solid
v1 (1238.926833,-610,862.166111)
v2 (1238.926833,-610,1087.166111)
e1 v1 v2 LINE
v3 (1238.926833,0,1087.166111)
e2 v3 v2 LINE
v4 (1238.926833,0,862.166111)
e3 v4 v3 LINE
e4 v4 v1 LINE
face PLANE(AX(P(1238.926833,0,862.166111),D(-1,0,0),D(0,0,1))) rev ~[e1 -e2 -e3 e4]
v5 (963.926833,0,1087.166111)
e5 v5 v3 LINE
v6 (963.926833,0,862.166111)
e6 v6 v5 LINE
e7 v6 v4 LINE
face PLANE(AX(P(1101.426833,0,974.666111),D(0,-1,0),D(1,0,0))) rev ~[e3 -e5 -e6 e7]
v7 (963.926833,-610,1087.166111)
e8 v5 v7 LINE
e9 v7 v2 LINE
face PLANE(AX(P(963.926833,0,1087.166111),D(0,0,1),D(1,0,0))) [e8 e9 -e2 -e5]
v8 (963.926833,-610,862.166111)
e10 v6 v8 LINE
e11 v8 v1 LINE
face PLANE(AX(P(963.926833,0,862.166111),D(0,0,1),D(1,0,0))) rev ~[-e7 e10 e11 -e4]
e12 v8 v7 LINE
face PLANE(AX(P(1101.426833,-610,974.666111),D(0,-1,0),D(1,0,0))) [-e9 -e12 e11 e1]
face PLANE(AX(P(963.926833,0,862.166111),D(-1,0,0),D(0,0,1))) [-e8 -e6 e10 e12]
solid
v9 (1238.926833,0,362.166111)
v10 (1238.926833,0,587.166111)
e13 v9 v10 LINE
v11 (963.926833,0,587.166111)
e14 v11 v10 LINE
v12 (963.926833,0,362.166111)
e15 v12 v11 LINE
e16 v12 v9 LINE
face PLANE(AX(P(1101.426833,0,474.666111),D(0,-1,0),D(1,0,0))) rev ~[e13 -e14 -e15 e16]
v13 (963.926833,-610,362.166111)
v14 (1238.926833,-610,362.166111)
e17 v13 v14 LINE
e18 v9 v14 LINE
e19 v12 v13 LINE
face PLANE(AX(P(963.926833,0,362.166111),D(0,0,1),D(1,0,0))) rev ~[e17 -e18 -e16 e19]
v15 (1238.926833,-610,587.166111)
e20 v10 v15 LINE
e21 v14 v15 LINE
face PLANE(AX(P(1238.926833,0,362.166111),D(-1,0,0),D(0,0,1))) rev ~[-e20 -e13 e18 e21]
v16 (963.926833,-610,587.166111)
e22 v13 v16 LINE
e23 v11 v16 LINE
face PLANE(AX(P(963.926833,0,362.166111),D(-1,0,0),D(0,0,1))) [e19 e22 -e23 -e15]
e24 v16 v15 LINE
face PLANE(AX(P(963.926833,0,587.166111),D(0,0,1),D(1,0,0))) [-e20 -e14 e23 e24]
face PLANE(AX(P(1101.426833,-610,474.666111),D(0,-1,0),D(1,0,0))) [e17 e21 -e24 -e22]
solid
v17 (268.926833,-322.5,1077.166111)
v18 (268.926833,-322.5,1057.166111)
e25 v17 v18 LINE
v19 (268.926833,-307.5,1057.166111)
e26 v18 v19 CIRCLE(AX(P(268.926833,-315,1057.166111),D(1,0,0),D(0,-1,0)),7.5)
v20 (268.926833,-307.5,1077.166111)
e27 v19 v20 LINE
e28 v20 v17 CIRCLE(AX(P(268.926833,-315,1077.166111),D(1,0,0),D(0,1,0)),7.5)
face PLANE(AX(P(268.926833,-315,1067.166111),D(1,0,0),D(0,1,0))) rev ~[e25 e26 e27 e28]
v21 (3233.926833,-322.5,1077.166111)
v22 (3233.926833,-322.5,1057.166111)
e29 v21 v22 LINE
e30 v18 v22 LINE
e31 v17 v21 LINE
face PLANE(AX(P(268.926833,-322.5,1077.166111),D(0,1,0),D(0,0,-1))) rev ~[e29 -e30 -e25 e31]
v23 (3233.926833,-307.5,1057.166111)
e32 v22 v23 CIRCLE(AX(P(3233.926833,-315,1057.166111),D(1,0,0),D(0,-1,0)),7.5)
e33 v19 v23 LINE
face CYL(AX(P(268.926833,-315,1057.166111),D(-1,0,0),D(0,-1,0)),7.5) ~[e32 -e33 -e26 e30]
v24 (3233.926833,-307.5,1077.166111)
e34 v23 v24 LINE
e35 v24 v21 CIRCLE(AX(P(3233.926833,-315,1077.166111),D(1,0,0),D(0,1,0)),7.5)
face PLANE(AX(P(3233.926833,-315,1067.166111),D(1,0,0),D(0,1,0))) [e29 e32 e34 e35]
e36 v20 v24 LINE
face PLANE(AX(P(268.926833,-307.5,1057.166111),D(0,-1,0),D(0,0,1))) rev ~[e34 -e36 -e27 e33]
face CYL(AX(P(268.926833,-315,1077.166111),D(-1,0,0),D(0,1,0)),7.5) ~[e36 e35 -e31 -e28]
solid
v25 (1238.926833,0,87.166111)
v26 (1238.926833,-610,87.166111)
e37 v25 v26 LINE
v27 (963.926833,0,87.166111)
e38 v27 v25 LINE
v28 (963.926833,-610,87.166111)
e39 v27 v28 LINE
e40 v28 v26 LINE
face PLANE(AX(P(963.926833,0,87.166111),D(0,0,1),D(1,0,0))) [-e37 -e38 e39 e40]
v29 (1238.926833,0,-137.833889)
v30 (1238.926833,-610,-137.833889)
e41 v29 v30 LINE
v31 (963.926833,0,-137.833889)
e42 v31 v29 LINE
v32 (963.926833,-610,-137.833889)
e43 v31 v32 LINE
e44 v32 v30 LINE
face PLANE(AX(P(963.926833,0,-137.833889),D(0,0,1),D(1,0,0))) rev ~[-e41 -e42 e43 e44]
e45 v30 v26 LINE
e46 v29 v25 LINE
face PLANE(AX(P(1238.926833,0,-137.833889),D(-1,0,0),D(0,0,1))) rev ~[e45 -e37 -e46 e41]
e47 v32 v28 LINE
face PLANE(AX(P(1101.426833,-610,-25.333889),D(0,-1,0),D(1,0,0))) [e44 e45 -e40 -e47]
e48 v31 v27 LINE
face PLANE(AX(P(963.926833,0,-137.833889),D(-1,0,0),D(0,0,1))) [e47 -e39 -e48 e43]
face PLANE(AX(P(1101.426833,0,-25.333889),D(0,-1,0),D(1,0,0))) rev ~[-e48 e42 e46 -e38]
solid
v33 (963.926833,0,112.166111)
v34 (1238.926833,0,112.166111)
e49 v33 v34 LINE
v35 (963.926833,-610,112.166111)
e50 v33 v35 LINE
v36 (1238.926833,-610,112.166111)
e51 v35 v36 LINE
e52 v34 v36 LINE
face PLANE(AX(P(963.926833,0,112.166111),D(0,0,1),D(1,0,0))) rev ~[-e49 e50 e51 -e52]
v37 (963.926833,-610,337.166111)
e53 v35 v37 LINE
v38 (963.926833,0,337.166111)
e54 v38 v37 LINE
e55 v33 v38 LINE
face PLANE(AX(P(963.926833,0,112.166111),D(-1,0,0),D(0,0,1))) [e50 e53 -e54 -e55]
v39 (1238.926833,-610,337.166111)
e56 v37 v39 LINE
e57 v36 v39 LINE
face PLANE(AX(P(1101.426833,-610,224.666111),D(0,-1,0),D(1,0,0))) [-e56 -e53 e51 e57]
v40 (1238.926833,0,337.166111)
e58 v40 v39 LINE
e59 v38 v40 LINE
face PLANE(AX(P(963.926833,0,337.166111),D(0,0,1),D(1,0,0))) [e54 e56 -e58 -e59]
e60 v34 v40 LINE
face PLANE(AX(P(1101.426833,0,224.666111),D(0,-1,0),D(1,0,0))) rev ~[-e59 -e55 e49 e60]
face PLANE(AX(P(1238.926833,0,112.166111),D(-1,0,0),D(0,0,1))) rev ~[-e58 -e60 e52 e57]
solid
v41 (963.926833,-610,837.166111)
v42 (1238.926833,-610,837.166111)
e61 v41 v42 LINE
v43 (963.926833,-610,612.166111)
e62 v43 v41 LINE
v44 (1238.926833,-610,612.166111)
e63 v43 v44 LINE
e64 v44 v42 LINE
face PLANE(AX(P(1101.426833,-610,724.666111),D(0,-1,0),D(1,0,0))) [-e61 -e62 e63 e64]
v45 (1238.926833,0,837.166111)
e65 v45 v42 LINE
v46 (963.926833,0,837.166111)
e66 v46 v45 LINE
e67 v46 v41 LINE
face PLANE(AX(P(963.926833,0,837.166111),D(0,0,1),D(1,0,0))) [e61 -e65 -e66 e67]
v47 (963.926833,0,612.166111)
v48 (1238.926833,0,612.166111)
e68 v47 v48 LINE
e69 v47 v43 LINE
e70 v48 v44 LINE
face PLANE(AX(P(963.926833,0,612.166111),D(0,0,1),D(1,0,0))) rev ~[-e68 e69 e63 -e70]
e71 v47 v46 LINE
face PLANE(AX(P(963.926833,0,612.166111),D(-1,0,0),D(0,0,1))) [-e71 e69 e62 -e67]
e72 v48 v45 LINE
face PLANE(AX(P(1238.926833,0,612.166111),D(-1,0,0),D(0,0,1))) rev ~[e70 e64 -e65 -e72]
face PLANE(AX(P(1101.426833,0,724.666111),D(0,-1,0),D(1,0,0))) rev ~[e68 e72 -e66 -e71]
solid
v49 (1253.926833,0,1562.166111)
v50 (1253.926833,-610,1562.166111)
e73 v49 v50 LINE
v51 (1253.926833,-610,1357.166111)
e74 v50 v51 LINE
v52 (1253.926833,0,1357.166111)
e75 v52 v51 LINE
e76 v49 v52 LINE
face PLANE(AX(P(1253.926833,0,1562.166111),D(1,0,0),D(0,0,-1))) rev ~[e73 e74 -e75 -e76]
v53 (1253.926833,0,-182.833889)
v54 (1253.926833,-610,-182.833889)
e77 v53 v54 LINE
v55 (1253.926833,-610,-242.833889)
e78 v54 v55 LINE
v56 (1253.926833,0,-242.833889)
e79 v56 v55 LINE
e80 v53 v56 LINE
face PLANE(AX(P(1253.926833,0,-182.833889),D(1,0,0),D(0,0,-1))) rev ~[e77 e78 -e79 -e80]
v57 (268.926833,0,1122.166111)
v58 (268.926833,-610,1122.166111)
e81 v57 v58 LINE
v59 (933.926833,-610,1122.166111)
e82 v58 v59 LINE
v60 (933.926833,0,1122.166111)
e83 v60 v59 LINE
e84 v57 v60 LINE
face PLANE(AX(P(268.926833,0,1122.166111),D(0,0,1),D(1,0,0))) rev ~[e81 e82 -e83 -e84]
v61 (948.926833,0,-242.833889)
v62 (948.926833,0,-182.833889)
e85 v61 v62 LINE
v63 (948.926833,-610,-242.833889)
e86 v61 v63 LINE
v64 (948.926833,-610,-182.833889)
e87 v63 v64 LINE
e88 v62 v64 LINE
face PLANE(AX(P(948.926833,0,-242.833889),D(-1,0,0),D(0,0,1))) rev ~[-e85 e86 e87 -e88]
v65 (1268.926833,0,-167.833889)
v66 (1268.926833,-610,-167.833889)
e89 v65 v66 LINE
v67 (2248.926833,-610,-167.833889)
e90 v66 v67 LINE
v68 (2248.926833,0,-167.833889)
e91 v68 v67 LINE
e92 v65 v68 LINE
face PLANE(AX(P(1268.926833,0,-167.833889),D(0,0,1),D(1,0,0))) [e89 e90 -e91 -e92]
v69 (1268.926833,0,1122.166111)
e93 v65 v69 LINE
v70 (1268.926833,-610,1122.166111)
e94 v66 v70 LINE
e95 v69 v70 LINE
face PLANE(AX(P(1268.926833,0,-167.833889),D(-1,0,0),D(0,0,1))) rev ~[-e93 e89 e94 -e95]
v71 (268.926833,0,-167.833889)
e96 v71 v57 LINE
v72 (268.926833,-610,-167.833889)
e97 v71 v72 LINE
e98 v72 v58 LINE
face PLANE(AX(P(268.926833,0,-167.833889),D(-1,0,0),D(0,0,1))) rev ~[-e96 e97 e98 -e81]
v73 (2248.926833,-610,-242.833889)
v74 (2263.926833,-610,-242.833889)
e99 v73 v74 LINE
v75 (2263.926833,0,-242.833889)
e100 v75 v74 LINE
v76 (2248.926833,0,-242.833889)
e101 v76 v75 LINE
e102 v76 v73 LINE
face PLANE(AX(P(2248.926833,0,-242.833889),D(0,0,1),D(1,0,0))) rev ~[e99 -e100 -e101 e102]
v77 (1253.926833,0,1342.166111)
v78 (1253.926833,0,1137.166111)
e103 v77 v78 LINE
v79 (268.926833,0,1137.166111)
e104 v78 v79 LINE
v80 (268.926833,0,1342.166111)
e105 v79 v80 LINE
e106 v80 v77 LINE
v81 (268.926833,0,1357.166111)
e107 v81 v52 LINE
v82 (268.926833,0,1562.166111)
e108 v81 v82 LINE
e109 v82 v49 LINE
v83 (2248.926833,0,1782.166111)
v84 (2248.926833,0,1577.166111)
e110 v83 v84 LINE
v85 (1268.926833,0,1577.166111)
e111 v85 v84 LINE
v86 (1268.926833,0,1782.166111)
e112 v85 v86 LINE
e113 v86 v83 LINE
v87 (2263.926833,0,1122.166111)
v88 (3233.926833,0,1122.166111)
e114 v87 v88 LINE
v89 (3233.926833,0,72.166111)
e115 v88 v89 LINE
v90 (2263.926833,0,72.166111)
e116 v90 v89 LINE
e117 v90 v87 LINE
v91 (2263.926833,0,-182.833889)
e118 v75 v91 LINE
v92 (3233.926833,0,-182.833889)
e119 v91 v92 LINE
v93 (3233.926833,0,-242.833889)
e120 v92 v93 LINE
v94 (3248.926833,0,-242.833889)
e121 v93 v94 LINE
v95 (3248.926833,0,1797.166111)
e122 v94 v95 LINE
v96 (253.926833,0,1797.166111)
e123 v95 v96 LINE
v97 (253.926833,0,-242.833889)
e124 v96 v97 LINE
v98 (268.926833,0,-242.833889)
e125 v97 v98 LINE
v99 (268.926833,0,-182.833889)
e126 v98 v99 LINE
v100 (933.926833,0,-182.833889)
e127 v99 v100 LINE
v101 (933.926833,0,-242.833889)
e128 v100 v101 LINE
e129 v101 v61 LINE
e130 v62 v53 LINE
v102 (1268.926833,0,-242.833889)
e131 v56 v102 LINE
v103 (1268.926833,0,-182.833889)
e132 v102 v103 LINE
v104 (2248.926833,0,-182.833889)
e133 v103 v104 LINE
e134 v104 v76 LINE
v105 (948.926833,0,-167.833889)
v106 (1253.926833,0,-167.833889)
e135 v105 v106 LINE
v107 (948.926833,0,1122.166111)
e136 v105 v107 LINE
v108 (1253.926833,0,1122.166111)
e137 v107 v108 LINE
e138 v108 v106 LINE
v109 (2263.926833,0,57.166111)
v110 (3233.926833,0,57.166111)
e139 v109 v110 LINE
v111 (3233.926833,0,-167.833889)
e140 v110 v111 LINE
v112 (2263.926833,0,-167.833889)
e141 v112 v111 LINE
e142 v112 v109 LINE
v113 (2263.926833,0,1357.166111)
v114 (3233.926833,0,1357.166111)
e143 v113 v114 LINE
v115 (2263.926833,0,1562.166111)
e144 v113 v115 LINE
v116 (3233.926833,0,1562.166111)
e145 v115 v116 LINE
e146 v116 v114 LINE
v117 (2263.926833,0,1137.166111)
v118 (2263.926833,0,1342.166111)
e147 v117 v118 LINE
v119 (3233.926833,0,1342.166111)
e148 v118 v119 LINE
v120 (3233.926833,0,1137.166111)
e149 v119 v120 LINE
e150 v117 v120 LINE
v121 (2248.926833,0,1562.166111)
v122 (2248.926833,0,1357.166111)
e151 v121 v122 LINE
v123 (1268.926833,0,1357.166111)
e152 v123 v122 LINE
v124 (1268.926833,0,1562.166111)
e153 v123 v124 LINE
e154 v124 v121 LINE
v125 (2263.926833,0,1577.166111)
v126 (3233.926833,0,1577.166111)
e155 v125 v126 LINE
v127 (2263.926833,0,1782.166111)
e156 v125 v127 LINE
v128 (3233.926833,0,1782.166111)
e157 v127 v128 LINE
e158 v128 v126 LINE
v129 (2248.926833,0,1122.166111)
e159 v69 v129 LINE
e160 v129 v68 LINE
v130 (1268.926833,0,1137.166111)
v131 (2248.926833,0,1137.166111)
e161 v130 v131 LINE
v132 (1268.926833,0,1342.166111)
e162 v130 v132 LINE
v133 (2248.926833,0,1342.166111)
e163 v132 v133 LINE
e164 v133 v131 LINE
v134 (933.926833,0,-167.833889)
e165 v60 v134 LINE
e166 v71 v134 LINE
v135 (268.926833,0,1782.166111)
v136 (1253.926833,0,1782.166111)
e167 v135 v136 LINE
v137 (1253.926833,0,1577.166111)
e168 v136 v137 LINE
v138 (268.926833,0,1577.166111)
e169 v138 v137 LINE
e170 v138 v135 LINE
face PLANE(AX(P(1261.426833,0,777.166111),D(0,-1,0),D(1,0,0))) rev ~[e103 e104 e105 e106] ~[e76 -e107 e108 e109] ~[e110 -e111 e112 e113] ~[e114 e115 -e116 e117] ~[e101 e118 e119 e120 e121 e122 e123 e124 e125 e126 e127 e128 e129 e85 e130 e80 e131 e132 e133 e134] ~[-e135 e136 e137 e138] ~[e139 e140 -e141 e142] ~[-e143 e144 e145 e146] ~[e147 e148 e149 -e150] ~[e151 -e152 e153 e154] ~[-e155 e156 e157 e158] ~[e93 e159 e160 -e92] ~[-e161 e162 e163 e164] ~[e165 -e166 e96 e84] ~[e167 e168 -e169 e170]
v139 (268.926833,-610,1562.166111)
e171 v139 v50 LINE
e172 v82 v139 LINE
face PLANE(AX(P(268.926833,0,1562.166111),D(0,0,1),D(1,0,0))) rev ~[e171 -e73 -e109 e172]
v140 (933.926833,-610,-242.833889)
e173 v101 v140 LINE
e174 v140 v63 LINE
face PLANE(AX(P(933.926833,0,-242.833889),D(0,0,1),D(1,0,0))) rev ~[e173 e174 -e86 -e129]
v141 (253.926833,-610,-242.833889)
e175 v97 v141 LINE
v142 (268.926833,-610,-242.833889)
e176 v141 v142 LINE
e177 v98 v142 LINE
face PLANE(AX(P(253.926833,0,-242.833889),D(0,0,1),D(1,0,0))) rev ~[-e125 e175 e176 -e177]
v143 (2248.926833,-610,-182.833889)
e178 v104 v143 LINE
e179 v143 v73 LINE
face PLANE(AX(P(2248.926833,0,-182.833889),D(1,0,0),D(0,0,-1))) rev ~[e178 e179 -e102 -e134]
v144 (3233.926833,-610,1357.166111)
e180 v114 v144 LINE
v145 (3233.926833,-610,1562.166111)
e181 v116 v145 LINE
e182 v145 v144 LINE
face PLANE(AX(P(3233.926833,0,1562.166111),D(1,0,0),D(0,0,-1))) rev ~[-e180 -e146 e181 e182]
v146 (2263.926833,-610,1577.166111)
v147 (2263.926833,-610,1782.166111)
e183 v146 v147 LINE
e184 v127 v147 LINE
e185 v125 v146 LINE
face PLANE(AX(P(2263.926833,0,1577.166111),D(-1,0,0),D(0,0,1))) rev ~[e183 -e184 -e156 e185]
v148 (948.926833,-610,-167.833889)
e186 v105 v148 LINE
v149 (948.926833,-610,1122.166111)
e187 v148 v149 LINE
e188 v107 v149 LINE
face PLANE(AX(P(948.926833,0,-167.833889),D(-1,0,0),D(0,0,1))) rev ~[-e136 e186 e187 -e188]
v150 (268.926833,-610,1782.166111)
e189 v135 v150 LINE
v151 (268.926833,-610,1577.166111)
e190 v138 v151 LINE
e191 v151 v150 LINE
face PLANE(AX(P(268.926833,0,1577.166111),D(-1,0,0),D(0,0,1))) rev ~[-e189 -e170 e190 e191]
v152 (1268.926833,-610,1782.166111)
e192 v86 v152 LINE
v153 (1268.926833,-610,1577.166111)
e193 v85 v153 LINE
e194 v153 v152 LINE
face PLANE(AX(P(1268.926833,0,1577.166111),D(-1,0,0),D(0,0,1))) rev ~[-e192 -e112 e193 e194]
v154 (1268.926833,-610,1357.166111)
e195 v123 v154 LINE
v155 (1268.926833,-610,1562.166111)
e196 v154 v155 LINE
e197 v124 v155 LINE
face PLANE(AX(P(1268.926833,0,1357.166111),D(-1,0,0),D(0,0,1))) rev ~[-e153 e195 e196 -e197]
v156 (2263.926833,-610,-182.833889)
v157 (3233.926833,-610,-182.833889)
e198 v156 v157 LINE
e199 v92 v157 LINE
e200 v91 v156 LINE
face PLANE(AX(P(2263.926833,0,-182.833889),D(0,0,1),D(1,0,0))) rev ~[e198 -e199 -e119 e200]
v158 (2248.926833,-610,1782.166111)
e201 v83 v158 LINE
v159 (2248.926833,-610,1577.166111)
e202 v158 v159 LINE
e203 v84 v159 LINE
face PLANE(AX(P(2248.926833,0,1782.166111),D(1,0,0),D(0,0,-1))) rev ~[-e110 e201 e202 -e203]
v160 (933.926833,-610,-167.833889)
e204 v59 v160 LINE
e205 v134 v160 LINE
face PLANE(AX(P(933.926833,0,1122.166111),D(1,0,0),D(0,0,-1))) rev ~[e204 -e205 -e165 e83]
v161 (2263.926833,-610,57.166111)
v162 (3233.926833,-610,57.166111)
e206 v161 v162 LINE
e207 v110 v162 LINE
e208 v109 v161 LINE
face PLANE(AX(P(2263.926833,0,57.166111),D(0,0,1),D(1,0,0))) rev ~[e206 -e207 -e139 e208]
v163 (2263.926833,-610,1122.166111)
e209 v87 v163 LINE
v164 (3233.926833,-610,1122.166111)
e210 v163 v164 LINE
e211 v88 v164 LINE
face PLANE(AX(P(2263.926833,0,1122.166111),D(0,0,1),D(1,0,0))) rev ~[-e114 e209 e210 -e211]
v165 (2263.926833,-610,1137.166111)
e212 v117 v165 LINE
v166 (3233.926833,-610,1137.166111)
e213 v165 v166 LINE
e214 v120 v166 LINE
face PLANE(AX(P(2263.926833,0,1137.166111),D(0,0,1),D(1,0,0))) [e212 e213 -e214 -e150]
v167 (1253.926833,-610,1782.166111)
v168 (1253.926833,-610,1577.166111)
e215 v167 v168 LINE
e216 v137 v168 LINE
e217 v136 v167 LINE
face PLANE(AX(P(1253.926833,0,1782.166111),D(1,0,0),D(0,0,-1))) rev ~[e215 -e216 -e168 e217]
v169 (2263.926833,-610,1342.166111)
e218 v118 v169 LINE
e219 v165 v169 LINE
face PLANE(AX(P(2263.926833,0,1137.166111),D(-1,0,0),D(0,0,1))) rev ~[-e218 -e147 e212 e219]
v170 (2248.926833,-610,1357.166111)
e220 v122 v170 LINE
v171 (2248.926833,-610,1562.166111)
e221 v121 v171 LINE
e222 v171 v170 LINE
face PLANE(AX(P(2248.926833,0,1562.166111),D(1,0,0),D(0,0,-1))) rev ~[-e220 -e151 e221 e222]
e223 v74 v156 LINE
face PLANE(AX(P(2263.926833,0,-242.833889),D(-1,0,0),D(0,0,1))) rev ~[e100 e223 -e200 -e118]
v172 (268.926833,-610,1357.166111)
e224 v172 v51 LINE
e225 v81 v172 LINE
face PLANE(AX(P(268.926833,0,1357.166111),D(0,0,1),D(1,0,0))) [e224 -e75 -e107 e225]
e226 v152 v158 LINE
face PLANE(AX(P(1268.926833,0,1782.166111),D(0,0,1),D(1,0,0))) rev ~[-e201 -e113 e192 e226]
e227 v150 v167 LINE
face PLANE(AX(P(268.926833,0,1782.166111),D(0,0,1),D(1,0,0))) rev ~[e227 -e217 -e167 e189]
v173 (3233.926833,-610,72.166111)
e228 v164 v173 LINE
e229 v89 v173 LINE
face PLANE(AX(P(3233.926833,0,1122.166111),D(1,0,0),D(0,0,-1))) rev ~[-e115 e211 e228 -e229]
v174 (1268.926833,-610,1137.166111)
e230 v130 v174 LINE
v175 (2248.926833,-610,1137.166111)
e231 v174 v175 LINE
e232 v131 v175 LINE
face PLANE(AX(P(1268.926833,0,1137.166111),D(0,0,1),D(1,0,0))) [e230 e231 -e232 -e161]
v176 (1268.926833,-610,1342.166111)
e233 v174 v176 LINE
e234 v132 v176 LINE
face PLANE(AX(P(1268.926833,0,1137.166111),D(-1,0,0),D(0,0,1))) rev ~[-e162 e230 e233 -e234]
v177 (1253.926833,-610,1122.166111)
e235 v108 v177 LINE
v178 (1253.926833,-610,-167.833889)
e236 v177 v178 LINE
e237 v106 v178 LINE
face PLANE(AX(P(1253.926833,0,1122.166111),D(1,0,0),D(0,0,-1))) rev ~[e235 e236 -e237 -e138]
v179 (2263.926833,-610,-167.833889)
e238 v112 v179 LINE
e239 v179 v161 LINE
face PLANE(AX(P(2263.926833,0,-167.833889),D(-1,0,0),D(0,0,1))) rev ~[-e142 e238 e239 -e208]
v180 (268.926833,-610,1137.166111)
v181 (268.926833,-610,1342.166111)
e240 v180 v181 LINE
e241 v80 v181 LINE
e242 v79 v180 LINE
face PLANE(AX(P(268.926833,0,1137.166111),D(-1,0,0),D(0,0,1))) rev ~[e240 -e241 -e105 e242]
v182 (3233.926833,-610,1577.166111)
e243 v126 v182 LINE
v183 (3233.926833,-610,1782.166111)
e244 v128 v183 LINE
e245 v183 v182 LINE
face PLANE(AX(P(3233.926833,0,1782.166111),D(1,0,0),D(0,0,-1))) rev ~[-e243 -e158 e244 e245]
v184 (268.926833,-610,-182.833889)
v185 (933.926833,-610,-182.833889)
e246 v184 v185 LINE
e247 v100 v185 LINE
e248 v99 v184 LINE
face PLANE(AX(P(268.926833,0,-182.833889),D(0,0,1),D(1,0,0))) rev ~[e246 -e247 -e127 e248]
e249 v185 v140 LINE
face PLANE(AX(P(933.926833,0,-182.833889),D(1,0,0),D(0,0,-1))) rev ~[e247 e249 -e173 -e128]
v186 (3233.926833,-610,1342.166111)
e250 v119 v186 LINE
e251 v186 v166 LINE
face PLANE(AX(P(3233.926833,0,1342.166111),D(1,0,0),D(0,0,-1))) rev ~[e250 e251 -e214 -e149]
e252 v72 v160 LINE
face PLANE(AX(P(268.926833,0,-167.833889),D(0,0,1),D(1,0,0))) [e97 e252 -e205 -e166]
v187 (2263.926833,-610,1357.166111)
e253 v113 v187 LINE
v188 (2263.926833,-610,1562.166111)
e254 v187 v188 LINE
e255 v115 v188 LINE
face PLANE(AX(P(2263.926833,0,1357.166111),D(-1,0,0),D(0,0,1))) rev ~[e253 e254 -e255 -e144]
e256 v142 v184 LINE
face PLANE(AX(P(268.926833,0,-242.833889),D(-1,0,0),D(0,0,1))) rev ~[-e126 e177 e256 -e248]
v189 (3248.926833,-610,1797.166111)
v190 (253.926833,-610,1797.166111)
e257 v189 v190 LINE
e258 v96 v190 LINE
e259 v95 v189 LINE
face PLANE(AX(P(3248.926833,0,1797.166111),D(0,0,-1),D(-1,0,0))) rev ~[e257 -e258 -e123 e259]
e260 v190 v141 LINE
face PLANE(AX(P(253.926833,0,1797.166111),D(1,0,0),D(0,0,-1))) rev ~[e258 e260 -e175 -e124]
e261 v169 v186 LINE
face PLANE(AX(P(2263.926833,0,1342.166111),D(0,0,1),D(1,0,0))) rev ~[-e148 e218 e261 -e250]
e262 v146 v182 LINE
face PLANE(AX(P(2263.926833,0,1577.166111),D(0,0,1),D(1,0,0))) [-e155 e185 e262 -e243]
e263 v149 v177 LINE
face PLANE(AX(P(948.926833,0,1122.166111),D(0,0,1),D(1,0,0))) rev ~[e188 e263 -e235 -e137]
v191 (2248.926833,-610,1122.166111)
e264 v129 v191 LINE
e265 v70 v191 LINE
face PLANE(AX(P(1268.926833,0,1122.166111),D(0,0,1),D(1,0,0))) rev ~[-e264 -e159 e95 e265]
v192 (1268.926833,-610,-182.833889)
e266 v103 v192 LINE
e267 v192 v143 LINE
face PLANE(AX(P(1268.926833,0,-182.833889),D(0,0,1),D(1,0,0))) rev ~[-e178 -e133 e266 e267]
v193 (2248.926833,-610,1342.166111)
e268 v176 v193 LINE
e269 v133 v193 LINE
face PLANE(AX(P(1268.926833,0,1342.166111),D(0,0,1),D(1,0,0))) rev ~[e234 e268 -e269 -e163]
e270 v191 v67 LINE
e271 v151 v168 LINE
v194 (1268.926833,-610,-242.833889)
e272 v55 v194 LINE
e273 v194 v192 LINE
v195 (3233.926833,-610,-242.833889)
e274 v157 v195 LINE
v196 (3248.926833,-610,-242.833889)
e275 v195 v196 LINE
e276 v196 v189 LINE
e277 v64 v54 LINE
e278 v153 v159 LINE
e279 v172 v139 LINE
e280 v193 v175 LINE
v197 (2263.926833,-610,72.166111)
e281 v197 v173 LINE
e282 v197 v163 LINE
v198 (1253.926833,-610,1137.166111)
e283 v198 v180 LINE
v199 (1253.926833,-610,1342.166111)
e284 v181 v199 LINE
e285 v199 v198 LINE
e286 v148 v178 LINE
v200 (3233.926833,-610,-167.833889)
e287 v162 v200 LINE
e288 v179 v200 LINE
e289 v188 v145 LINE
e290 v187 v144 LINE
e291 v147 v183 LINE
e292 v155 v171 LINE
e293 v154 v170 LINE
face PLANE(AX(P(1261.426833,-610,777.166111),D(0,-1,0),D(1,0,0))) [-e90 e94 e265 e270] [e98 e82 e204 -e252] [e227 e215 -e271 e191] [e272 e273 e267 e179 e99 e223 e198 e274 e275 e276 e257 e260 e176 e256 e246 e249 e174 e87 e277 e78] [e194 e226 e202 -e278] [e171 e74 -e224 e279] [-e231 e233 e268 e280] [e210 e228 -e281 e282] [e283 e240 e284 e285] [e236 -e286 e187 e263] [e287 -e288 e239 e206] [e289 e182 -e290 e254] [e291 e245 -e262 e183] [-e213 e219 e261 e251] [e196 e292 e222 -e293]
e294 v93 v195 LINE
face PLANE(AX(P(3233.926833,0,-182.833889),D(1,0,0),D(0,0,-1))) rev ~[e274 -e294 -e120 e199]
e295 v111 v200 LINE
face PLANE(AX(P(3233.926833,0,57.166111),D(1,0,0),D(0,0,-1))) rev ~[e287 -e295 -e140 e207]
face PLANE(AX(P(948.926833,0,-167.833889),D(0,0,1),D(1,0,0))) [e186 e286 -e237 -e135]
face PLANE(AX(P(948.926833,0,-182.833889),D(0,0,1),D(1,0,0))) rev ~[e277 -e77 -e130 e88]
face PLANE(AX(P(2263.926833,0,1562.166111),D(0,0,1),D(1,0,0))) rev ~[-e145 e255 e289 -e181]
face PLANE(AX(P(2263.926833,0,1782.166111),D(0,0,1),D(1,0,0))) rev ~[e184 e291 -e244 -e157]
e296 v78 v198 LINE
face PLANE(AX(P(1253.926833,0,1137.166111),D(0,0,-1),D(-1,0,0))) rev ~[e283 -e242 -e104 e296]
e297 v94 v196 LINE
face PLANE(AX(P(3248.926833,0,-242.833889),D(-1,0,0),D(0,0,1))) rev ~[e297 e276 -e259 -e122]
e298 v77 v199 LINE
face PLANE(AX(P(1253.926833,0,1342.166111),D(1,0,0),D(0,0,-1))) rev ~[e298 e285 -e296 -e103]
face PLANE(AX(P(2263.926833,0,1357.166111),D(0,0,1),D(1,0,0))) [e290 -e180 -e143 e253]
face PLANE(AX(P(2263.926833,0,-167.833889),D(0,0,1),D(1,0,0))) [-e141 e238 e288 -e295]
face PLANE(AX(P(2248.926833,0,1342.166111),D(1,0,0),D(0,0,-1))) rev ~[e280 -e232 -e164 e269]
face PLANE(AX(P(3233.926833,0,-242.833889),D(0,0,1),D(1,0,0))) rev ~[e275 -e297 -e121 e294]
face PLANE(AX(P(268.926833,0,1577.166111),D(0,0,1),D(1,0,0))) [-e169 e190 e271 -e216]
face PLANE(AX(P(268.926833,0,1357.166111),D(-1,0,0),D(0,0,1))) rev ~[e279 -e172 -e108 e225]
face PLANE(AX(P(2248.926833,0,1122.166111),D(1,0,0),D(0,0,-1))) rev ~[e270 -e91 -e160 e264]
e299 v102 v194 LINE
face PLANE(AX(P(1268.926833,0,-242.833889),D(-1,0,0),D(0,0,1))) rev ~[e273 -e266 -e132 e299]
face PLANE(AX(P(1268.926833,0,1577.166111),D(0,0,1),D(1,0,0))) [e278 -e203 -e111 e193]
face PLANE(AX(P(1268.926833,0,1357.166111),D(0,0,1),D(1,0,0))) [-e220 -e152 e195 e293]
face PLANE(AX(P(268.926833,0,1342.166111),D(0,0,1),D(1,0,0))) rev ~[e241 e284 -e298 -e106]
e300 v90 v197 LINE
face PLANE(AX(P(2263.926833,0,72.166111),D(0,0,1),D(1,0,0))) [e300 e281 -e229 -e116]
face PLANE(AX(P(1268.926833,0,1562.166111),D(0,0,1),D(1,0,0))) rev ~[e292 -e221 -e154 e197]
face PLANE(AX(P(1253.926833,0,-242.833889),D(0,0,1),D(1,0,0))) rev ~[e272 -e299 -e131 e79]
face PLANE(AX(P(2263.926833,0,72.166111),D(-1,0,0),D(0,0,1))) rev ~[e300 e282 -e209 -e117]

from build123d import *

# Parameters (mm, degrees)
F0_W     = 985
F0_H     = 15
F0_W_2   = 665
F0_W_3   = 305
F0_W_4   = 980
F0_W_5   = 970
F1_DEPTH = 610
F3_DEPTH = 2965
F0_W_6   = 275
F0_H_2   = 225
F4_DEPTH = 610


with BuildPart() as f1:
    # F0 (on Front) → F1 (new body)
    with BuildSketch(Plane.XZ):
        Polygon((1268.9268333363, 1797.1661111622), (1253.9268333363, 1797.1661111622), (1253.9268333363, 1782.1661111622), (1253.9268333363, 1577.1661111622), (1253.9268333363, 1562.1661111622), (1253.9268333363, 1357.1661111622), (1253.9268333363, 1342.1661111622), (1253.9268333363, 1137.1661111622), (1253.9268333363, 1122.1661111622), (1253.9268333363, -167.8338888378), (1253.9268333363, -182.8338888378), (1253.9268333363, -242.8338888378), (1268.9268333363, -242.8338888378), (1268.9268333363, -182.8338888378), (1268.9268333363, -167.8338888378), (1268.9268333363, 1122.1661111622), (1268.9268333363, 1137.1661111622), (1268.9268333363, 1342.1661111622), (1268.9268333363, 1357.1661111622), (1268.9268333363, 1562.1661111622), (1268.9268333363, 1577.1661111622), (1268.9268333363, 1782.1661111622), align=None)
        Polygon((268.9268333363, 1797.1661111622), (253.9268333363, 1797.1661111622), (253.9268333363, -242.8338888378), (268.9268333363, -242.8338888378), (268.9268333363, -182.8338888378), (268.9268333363, -167.8338888378), (268.9268333363, 1122.1661111622), (268.9268333363, 1137.1661111622), (268.9268333363, 1342.1661111622), (268.9268333363, 1357.1661111622), (268.9268333363, 1562.1661111622), (268.9268333363, 1577.1661111622), (268.9268333363, 1782.1661111622), align=None)
        Polygon((933.9268333363, -167.8338888378), (933.9268333363, -182.8338888378), (933.9268333363, -242.8338888378), (948.9268333363, -242.8338888378), (948.9268333363, -182.8338888378), (948.9268333363, -167.8338888378), (948.9268333363, 1122.1661111622), (933.9268333363, 1122.1661111622), align=None)
        with Locations((761.4268333363, 1789.6661111622)):
            Rectangle(F0_W, F0_H)
        with Locations((761.4268333363, 1569.6661111622)):
            Rectangle(F0_W, F0_H)
        with Locations((761.4268333363, 1349.6661111622)):
            Rectangle(F0_W, F0_H)
        Polygon((268.9268333363, 1137.1661111622), (268.9268333363, 1122.1661111622), (933.9268333363, 1122.1661111622), (948.9268333363, 1122.1661111622), (1253.9268333363, 1122.1661111622), (1253.9268333363, 1137.1661111622), align=None)
        with Locations((601.4268333363, -175.3338888378)):
            Rectangle(F0_W_2, F0_H)
        with Locations((1101.4268333363, -175.3338888378)):
            Rectangle(F0_W_3, F0_H)
        with Locations((1758.9268333363, 1789.6661111622)):
            Rectangle(F0_W_4, F0_H)
        with Locations((2748.9268333363, 1789.6661111622)):
            Rectangle(F0_W_5, F0_H)
        with Locations((1758.9268333363, 1569.6661111622)):
            Rectangle(F0_W_4, F0_H)
        with Locations((2748.9268333363, 1569.6661111622)):
            Rectangle(F0_W_5, F0_H)
        with Locations((2748.9268333363, 1349.6661111622)):
            Rectangle(F0_W_5, F0_H)
        with Locations((1758.9268333363, 1349.6661111622)):
            Rectangle(F0_W_4, F0_H)
        with Locations((1758.9268333363, 1129.6661111622)):
            Rectangle(F0_W_4, F0_H)
        with Locations((2748.9268333363, 1129.6661111622)):
            Rectangle(F0_W_5, F0_H)
        Polygon((2263.9268333363, 1797.1661111622), (2248.9268333363, 1797.1661111622), (2248.9268333363, 1782.1661111622), (2248.9268333363, 1577.1661111622), (2248.9268333363, 1562.1661111622), (2248.9268333363, 1357.1661111622), (2248.9268333363, 1342.1661111622), (2248.9268333363, 1137.1661111622), (2248.9268333363, 1122.1661111622), (2248.9268333363, -167.8338888378), (2248.9268333363, -182.8338888378), (2248.9268333363, -242.8338888378), (2263.9268333363, -242.8338888378), (2263.9268333363, -182.8338888378), (2263.9268333363, -167.8338888378), (2263.9268333363, 57.1661111622), (2263.9268333363, 72.1661111622), (2263.9268333363, 1122.1661111622), (2263.9268333363, 1137.1661111622), (2263.9268333363, 1342.1661111622), (2263.9268333363, 1357.1661111622), (2263.9268333363, 1562.1661111622), (2263.9268333363, 1577.1661111622), (2263.9268333363, 1782.1661111622), align=None)
        Polygon((3248.9268333363, 1797.1661111622), (3233.9268333363, 1797.1661111622), (3233.9268333363, 1782.1661111622), (3233.9268333363, 1577.1661111622), (3233.9268333363, 1562.1661111622), (3233.9268333363, 1357.1661111622), (3233.9268333363, 1342.1661111622), (3233.9268333363, 1137.1661111622), (3233.9268333363, 1122.1661111622), (3233.9268333363, 72.1661111622), (3233.9268333363, 57.1661111622), (3233.9268333363, -167.8338888378), (3233.9268333363, -182.8338888378), (3233.9268333363, -242.8338888378), (3248.9268333363, -242.8338888378), align=None)
        with Locations((2748.9268333363, -175.3338888378)):
            Rectangle(F0_W_5, F0_H)
        with Locations((1758.9268333363, -175.3338888378)):
            Rectangle(F0_W_4, F0_H)
        with Locations((2748.9268333363, 64.6661111622)):
            Rectangle(F0_W_5, F0_H)
    extrude(amount=F1_DEPTH)


with BuildPart() as f3:
    # F2 (on face) → F3 (new body, through all)
    with BuildSketch(Plane.YZ.offset(268.9268333363)):
        with BuildLine():
            Line((-322.5, 1077.1661111622), (-322.5, 1057.1661111622))
            ThreePointArc((-322.5, 1057.1661111622), (-315, 1049.6661111622), (-307.5, 1057.1661111622))
            Line((-307.5, 1057.1661111622), (-307.5, 1077.1661111622))
            ThreePointArc((-307.5, 1077.1661111622), (-315, 1084.6661111622), (-322.5, 1077.1661111622))
        make_face()
    extrude(amount=F3_DEPTH)


with BuildPart() as f4:
    # F0 (on Front) → F4 (new body)
    with BuildSketch(Plane.XZ):
        with Locations((1101.4268333363, 974.6661111622)):
            Rectangle(F0_W_6, F0_H_2)
    extrude(amount=F4_DEPTH)


with BuildPart() as f4b:
    # F0 (on Front) → F4, piece 2 (new body)
    with BuildSketch(Plane.XZ):
        with Locations((1101.4268333363, 724.6661111622)):
            Rectangle(F0_W_6, F0_H_2)
    extrude(amount=F4_DEPTH)


with BuildPart() as f4c:
    # F0 (on Front) → F4, piece 3 (new body)
    with BuildSketch(Plane.XZ):
        with Locations((1101.4268333363, 474.6661111622)):
            Rectangle(F0_W_6, F0_H_2)
    extrude(amount=F4_DEPTH)


with BuildPart() as f4d:
    # F0 (on Front) → F4, piece 4 (new body)
    with BuildSketch(Plane.XZ):
        with Locations((1101.4268333363, 224.6661111622)):
            Rectangle(F0_W_6, F0_H_2)
    extrude(amount=F4_DEPTH)


with BuildPart() as f4e:
    # F0 (on Front) → F4, piece 5 (new body)
    with BuildSketch(Plane.XZ):
        with Locations((1101.4268333363, -25.3338888378)):
            Rectangle(F0_W_6, F0_H_2)
    extrude(amount=F4_DEPTH)


solid = Compound([f1.part, f3.part, f4.part, f4b.part, f4c.part, f4d.part, f4e.part])
